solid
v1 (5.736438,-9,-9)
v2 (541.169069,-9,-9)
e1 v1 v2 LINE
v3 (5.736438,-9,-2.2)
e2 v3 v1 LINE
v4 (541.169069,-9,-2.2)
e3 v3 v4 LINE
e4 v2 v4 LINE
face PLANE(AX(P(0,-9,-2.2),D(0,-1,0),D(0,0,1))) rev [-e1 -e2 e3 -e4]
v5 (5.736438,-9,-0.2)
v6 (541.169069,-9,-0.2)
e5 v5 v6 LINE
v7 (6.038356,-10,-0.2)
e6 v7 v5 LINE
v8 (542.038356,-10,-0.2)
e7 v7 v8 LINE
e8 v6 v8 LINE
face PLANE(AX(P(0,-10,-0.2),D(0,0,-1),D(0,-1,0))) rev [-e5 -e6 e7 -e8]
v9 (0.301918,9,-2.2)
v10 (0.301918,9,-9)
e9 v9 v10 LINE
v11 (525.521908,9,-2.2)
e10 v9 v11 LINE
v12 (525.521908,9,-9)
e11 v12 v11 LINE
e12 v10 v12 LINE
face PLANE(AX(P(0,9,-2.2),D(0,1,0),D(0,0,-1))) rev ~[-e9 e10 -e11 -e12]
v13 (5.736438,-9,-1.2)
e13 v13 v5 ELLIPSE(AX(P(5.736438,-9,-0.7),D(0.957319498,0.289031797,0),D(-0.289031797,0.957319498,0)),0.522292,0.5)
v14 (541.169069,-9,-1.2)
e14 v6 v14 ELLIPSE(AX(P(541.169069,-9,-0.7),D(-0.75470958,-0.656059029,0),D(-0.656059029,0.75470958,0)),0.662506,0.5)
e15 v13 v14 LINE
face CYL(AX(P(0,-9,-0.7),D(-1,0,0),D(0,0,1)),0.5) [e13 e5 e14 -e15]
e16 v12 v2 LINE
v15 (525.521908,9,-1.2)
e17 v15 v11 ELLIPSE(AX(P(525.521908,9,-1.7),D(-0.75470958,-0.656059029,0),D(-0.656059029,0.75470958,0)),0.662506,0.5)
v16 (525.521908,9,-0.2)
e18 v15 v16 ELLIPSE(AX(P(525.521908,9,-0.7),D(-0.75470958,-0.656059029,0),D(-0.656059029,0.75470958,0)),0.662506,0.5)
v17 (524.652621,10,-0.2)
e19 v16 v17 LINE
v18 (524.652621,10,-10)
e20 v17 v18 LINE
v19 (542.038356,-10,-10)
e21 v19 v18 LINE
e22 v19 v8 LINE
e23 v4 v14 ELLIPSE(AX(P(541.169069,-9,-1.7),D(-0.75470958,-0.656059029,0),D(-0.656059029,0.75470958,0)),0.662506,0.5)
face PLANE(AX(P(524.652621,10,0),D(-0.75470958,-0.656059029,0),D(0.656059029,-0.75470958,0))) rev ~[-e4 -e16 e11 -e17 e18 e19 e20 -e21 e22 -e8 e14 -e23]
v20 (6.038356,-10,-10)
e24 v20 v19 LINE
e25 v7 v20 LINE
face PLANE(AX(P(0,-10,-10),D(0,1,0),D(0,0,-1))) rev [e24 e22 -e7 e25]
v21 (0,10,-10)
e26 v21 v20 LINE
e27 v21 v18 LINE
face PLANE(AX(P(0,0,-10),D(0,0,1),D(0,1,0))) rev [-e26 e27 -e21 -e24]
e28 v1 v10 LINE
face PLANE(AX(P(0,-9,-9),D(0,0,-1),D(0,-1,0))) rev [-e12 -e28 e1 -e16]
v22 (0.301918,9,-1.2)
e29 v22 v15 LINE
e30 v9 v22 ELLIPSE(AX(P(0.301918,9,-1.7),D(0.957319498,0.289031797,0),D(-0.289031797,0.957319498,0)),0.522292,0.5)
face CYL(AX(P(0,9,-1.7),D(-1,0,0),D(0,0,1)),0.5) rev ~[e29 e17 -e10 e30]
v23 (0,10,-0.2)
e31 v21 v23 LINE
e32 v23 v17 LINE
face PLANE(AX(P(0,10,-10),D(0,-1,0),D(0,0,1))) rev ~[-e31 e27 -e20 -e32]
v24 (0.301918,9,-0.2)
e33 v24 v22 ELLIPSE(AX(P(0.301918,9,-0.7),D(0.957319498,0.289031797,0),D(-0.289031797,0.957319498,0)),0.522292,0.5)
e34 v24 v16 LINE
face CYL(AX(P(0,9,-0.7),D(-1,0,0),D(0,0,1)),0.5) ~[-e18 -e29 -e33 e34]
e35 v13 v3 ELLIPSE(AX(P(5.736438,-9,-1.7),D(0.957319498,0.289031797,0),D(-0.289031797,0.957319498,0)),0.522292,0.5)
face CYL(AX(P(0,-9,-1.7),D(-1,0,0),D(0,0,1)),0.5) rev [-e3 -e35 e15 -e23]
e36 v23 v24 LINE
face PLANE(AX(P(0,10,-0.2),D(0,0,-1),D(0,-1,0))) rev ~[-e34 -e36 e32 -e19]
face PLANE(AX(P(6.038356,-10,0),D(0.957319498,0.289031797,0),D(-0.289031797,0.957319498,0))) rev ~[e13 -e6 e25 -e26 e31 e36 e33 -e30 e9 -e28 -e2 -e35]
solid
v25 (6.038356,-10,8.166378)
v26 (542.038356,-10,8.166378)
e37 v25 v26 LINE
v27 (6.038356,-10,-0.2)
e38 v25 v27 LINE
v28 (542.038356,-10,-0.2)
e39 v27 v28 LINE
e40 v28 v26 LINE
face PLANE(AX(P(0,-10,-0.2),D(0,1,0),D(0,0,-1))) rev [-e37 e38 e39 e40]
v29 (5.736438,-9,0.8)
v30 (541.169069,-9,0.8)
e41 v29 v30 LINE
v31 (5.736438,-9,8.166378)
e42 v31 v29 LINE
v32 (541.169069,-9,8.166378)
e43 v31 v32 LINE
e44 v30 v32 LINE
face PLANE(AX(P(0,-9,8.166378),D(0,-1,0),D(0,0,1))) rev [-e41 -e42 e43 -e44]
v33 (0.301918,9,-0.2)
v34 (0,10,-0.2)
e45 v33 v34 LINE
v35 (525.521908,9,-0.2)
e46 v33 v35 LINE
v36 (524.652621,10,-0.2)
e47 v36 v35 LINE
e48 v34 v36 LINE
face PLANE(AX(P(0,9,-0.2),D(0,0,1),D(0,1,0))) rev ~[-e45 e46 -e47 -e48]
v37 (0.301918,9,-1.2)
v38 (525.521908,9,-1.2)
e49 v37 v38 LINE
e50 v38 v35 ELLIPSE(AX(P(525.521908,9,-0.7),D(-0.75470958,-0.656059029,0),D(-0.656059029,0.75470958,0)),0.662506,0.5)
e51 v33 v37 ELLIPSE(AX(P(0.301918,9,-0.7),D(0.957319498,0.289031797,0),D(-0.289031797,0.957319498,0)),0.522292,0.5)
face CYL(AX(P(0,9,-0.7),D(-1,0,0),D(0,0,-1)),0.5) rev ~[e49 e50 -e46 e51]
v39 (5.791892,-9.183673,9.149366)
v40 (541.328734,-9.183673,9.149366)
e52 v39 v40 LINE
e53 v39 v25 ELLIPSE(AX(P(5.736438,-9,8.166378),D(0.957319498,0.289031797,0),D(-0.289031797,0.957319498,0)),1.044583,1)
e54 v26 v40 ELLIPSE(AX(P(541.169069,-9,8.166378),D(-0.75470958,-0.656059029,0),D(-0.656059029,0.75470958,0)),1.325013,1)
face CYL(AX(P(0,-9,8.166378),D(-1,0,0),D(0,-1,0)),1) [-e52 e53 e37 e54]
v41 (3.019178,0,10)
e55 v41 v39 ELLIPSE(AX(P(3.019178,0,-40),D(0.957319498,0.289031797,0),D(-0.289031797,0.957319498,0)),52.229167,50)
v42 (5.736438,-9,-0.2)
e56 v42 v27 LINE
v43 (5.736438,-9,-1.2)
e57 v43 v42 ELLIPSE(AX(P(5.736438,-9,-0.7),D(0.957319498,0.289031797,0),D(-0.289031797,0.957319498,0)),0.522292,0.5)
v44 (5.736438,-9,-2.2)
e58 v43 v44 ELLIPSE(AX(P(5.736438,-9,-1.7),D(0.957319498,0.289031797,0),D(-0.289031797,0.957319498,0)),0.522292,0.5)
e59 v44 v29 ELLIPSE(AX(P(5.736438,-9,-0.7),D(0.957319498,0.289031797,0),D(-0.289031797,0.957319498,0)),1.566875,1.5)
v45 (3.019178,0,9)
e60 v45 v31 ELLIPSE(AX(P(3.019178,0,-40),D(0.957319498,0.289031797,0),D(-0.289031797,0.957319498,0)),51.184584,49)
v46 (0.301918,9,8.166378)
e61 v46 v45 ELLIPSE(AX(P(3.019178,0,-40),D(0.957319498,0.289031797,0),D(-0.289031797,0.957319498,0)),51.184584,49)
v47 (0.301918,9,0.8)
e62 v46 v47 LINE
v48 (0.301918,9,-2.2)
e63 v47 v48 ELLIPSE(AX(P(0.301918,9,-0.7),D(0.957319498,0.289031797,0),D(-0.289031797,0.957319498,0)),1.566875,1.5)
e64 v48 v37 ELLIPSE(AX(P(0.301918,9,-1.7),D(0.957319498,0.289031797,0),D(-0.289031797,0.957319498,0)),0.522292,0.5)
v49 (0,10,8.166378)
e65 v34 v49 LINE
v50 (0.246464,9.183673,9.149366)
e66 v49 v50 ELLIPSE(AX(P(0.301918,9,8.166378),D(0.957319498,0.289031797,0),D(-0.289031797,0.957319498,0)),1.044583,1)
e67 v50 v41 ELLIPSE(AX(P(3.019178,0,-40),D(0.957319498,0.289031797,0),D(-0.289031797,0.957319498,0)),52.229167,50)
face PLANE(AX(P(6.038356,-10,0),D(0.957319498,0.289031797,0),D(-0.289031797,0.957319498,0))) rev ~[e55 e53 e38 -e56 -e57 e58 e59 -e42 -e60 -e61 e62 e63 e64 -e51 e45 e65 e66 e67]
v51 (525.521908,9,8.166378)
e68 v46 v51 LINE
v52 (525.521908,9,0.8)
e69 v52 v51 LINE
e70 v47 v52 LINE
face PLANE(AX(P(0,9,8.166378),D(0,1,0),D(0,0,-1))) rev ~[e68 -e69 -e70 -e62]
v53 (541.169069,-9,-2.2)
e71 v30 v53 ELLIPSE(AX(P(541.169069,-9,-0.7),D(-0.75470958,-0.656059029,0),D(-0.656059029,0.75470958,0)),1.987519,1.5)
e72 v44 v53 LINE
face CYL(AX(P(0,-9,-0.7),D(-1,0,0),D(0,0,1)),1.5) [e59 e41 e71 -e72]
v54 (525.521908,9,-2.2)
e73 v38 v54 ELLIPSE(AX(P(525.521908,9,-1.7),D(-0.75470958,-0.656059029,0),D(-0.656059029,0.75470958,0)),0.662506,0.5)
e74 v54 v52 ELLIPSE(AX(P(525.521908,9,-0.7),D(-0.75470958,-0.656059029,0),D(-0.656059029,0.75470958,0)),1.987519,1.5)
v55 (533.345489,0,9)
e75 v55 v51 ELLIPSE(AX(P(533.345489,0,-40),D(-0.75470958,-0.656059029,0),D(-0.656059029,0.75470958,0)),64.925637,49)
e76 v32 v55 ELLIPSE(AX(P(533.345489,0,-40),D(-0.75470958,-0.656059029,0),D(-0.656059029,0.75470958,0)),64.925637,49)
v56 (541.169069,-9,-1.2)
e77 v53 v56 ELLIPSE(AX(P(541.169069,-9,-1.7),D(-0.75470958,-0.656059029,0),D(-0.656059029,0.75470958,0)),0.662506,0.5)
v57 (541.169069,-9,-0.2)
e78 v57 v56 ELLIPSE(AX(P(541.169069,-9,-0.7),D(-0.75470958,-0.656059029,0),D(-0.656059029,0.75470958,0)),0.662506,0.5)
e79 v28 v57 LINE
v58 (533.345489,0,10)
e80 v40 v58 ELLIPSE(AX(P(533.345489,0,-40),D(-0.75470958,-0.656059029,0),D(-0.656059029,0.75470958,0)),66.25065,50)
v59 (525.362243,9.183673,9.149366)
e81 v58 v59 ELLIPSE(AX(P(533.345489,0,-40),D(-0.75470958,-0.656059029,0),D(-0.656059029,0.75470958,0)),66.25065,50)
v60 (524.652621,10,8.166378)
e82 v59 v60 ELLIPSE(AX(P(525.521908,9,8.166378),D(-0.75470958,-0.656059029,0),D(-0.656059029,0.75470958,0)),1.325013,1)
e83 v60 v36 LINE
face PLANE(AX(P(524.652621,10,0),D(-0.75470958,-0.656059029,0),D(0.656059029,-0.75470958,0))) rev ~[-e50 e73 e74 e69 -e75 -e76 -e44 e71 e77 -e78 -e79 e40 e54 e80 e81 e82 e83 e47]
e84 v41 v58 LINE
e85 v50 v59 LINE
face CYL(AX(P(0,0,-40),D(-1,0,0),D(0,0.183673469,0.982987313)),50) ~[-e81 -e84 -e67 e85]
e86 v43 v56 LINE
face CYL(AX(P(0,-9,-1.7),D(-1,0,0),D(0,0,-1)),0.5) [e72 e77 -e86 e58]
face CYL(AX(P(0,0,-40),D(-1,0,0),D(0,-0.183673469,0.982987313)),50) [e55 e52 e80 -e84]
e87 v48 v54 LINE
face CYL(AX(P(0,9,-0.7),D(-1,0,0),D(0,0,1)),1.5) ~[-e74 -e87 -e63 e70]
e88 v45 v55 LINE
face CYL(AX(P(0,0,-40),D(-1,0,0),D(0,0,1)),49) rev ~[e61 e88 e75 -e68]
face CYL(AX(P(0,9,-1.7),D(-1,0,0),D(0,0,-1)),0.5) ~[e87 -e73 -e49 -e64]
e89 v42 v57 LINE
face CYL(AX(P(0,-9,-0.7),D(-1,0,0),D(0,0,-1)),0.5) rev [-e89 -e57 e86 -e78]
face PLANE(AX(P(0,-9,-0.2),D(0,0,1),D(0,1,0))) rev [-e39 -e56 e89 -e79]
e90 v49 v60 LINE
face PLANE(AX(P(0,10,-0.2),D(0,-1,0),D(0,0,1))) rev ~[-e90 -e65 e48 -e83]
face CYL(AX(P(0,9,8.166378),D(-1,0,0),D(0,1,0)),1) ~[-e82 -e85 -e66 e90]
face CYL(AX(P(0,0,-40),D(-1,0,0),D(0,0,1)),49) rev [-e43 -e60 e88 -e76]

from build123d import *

# Parameters (mm, degrees)
F2_DEPTH      = 1000
F4_DEPTH      = 1000
F8_DEPTH      = 10.001
F8_DEPTH_BACK = 10.001


with BuildPart() as f2:
    # F1 (on Right) → F2 (new body)
    with BuildSketch(Plane.YZ):
        with BuildLine():
            Line((0, -9), (0, -10))
            Line((0, -10), (10, -10))
            Line((10, -10), (10, -0.2))
            Line((10, -0.2), (9, -0.2))
            ThreePointArc((9, -0.2), (8.5, -0.7), (9, -1.2))
            ThreePointArc((9, -1.2), (9.5, -1.7), (9, -2.2))
            Line((9, -2.2), (9, -9))
            Line((9, -9), (0, -9))
        make_face()
    extrude(amount=F2_DEPTH)

    # F5: F2 across plane


with BuildPart() as f4:
    # F3 (on Right) → F4 (new body)
    with BuildSketch(Plane.YZ):
        with BuildLine():
            Line((9, -0.2), (10, -0.2))
            Line((10, -0.2), (10, 8.1663783152))
            ThreePointArc((10, 8.1663783152), (9.7693092582, 8.8052548802), (9.1836734694, 9.1493656277))
            ThreePointArc((9.1836734694, 9.1493656277), (4.6114920912, 9.7868872364), (0, 10))
            Line((0, 10), (0, 9))
            ThreePointArc((0, 9), (4.5192622493, 8.7911494917), (9, 8.1663783152))
            Line((9, 8.1663783152), (9, 0.8))
            ThreePointArc((9, 0.8), (7.5, -0.7), (9, -2.2))
            ThreePointArc((9, -2.2), (9.5, -1.7), (9, -1.2))
            ThreePointArc((9, -1.2), (8.5, -0.7), (9, -0.2))
        make_face()
    extrude(amount=F4_DEPTH)

    # F6: F4 across plane


with BuildPart() as f2_1:
    add(f2.part)
    add(f2.part.mirror(Plane.XZ))


with BuildPart() as f4_1:
    add(f4.part)
    add(f4.part.mirror(Plane.XZ))


with BuildPart() as f8_tool:
    # F7 (on Top) → F8 (new body, two sides)
    with BuildSketch(Plane.XY) as f8_sk:
        Polygon((0, 10), (0, 0), (0, -10), (6.0383560074, -10), align=None)
        Polygon((709.9114181152, 10), (524.652621251, 10), (542.0383560074, -10), (1016.9613361359, -10), (1016.9613361359, 10), align=None)
    extrude(amount=F8_DEPTH)
    extrude(f8_sk.sketch, amount=-F8_DEPTH_BACK)


with BuildPart() as f2_2:
    add(f2_1.part)

    # F8: cut by f8_tool
    add(f8_tool.part, mode=Mode.SUBTRACT)


with BuildPart() as f4_2:
    add(f4_1.part)

    # F8: cut by f8_tool
    add(f8_tool.part, mode=Mode.SUBTRACT)


solid = Compound([f2_2.part, f4_2.part])
